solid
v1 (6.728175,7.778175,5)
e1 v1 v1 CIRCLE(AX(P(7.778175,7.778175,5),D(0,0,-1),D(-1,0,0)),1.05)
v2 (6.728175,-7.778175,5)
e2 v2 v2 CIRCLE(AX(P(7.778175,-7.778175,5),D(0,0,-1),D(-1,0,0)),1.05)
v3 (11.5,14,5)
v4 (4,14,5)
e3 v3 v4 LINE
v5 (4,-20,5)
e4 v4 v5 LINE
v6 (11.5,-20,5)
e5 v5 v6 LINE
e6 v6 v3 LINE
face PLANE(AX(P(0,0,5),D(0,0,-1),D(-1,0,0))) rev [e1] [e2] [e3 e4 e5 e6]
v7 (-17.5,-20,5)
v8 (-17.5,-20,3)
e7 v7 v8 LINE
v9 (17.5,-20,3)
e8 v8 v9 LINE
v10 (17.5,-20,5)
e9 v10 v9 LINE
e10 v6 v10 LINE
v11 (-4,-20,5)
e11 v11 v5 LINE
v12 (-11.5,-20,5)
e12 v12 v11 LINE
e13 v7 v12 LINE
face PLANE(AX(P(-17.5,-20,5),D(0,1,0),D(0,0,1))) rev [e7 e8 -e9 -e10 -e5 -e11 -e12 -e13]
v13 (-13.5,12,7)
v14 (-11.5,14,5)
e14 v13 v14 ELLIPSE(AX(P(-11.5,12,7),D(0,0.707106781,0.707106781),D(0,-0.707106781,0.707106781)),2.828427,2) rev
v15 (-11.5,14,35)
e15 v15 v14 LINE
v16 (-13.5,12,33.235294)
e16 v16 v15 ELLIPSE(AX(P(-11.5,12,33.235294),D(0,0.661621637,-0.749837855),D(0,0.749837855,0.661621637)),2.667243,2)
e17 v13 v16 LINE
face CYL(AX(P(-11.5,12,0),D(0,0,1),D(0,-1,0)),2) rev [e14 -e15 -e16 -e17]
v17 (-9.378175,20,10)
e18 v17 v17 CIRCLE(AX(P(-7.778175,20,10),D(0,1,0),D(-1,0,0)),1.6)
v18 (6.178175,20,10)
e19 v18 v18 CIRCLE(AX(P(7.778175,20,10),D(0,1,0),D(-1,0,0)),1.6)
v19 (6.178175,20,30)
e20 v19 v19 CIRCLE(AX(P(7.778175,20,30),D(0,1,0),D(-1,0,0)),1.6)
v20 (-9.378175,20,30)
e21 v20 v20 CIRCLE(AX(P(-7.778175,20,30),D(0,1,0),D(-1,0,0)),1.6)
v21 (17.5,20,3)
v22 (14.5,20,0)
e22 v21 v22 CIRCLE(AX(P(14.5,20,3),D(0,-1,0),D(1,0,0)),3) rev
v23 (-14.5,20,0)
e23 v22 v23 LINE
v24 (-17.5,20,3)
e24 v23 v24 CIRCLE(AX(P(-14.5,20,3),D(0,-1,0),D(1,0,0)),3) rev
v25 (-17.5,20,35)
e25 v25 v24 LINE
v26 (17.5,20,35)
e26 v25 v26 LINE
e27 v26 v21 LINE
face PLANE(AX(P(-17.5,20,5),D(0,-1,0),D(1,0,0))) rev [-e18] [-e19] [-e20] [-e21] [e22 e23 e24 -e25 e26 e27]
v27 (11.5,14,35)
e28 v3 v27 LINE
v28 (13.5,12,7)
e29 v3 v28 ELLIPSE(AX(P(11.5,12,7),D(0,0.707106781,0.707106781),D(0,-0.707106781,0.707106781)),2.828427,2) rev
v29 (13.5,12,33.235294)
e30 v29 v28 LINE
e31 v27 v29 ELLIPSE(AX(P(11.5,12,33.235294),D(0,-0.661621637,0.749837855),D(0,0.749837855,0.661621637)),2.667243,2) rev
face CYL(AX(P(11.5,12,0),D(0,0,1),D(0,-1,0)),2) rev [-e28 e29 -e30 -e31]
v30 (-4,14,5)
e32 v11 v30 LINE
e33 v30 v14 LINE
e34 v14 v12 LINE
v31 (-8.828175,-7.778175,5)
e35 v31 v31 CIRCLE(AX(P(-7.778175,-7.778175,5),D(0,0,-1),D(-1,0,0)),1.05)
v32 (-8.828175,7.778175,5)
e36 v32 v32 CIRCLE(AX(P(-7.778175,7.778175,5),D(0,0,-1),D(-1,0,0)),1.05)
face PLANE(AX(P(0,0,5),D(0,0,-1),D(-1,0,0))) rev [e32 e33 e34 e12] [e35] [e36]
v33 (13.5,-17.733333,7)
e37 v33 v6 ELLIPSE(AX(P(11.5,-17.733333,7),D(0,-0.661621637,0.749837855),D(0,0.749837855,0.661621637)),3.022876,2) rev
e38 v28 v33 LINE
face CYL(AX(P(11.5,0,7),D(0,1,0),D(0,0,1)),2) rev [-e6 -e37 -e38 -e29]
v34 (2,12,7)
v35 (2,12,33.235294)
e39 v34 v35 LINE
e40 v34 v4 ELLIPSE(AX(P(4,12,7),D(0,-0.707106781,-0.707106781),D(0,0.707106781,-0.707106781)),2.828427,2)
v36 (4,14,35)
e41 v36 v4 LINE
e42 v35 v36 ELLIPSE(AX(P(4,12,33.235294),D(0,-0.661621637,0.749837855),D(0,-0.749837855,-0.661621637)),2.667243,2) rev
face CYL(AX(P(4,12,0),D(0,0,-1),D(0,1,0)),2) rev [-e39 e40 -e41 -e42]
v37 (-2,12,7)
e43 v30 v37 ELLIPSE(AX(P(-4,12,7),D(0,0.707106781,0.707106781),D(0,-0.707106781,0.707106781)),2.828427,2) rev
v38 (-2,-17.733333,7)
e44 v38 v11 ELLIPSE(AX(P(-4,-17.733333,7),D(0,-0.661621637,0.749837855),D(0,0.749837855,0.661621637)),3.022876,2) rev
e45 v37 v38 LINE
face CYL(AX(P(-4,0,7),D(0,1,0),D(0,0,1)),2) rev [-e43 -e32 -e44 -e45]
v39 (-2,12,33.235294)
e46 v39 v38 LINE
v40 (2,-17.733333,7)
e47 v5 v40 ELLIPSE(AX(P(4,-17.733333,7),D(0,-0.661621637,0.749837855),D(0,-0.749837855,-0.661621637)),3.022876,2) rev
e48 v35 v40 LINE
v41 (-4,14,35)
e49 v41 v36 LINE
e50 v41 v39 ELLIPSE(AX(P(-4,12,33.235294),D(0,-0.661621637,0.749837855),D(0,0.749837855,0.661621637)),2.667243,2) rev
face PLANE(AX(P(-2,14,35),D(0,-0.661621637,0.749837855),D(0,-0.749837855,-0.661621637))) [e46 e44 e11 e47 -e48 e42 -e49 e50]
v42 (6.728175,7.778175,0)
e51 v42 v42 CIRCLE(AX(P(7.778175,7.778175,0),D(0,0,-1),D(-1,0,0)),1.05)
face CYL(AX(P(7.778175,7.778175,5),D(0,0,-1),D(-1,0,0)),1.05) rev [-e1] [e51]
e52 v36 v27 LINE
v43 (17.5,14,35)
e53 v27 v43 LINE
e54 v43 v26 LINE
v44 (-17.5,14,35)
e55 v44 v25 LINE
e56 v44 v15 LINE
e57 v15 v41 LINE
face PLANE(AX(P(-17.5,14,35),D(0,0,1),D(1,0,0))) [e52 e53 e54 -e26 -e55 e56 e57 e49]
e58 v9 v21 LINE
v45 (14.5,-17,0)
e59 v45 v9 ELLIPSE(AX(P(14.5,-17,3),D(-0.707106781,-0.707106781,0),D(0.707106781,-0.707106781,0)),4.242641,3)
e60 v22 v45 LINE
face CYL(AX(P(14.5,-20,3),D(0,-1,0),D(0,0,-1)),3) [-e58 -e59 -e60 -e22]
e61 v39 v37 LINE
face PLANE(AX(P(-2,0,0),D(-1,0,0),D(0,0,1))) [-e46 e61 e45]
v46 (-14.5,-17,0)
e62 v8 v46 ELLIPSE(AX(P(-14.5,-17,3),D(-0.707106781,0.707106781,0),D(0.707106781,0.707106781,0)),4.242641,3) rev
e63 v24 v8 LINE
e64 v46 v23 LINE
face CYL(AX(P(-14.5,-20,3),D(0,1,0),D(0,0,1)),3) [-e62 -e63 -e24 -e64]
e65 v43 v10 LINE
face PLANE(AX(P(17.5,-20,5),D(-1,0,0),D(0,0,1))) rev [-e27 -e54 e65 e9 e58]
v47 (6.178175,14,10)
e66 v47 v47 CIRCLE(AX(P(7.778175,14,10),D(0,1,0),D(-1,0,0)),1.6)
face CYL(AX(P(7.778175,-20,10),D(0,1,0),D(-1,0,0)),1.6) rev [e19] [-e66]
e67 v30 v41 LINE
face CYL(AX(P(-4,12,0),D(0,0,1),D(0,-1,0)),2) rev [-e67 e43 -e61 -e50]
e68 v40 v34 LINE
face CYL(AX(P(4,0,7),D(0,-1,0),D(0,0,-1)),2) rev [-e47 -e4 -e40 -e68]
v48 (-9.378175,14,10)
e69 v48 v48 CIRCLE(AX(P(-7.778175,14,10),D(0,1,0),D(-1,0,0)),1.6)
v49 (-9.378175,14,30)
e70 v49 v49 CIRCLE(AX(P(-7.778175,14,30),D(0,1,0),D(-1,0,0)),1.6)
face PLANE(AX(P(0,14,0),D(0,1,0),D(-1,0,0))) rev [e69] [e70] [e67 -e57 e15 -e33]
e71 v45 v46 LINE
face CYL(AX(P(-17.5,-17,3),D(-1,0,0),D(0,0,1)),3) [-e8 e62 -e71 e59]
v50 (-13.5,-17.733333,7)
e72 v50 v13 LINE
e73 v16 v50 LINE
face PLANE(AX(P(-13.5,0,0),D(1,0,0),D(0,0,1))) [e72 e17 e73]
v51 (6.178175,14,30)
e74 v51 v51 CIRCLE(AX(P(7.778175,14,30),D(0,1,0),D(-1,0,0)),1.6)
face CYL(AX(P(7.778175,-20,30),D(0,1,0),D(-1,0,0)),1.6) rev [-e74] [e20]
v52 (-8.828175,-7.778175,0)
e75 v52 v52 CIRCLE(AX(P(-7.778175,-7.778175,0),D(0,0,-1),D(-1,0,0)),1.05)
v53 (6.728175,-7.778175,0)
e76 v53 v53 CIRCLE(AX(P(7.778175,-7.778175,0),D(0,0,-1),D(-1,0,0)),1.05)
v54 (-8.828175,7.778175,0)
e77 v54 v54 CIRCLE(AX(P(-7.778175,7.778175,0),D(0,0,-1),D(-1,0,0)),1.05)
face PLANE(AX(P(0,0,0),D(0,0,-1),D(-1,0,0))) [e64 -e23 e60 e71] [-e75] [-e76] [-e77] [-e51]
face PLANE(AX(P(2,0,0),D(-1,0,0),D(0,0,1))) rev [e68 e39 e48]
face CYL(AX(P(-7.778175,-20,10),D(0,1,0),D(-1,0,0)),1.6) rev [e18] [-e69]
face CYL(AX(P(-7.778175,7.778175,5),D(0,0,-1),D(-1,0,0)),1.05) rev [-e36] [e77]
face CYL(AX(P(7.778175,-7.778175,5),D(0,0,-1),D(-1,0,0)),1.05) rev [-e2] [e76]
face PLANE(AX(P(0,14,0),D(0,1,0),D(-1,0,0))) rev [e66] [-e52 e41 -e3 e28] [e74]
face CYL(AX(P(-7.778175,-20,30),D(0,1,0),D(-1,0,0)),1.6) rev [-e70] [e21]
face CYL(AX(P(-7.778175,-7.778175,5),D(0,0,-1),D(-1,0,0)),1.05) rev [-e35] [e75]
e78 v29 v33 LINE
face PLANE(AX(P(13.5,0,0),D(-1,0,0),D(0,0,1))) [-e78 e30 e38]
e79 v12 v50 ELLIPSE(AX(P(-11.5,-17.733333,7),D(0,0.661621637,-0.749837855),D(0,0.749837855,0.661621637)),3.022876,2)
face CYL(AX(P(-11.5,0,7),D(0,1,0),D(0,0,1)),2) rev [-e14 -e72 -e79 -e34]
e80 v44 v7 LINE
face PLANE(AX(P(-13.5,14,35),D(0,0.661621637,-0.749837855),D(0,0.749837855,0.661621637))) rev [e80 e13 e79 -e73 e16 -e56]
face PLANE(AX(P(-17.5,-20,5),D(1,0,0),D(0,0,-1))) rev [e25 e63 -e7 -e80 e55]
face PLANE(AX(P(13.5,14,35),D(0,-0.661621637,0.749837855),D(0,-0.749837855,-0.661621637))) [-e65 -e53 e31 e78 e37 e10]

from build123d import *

# Parameters (mm, degrees)
SKETCH3_W                = 35
SKETCH3_H                = 40
BOSS_EXTRUDE1_DEPTH      = 5
SKETCH5_W                = 35
SKETCH5_H                = 30
BOSS_EXTRUDE2_DEPTH      = 6
BOSS_EXTRUDE3_DEPTH      = 4
BOSS_EXTRUDE4_DEPTH      = 2
BOSS_EXTRUDE4_DEPTH_BACK = 2
SKETCH9_R                = 1.05
CUT_EXTRUDE1_DEPTH       = 5
SKETCH10_R               = 1.6
CUT_EXTRUDE2_DEPTH       = 56.957573214
FILLET1_R                = 3
FILLET2_R                = 2


with BuildPart() as part:
    # Sketch3 → Boss-Extrude1 (new body)
    with BuildSketch(Plane.XY):
        Rectangle(SKETCH3_W, SKETCH3_H)
    extrude(amount=BOSS_EXTRUDE1_DEPTH)

    # Sketch5 → Boss-Extrude2 (add)
    with BuildSketch(Plane(origin=(0, 20, 0), x_dir=(1, 0, 0), z_dir=(0, 1, 0))):
        with Locations((0, -20)):
            Rectangle(SKETCH5_W, SKETCH5_H)
    extrude(amount=-BOSS_EXTRUDE2_DEPTH)

    # Sketch7 → Boss-Extrude3 (add)
    with BuildSketch(Plane(origin=(17.5, 0, 0), x_dir=(0, 0, -1), z_dir=(1, 0, 0))):
        Polygon((-35, 14), (-5, -20), (-5, 14), align=None)
    boss_extrude3 = extrude(amount=-BOSS_EXTRUDE3_DEPTH)

    # Mirror1: Boss-Extrude3 across plane
    add(boss_extrude3.mirror(Plane(origin=(0, 0, 0), x_dir=(0, 0, 1), z_dir=(1, 0, 0))))

    # Sketch8 → Boss-Extrude4 (add, two sides: drawn at the far end of the back side and taken through both)
    with BuildSketch(Plane(origin=(0, 0, 0), x_dir=(0, 0, -1), z_dir=(1, 0, 0)).offset(-BOSS_EXTRUDE4_DEPTH_BACK)):
        Polygon((-35, 14), (-5, -20), (-5, 14), align=None)
    extrude(amount=BOSS_EXTRUDE4_DEPTH + BOSS_EXTRUDE4_DEPTH_BACK)

    # Sketch9 → Cut-Extrude1 (cut)
    with BuildSketch(Plane(origin=(0, 0, 0), x_dir=(-1, 0, 0), z_dir=(0, 0, -1))):
        with Locations((-7.778174593, 7.778174593)):
            Circle(SKETCH9_R)
        with Locations((7.778174593, 7.778174593)):
            Circle(SKETCH9_R)
        with Locations((7.778174593, -7.778174593)):
            Circle(SKETCH9_R)
        with Locations((-7.778174593, -7.778174593)):
            Circle(SKETCH9_R)
    extrude(amount=-CUT_EXTRUDE1_DEPTH, mode=Mode.SUBTRACT)

    # Sketch10 → Cut-Extrude2 (cut, through all)
    with BuildSketch(Plane(origin=(0, 20, 0), x_dir=(1, 0, 0), z_dir=(0, 1, 0))):
        with Locations(Location((-7.778174593, -10, 0), (0, 0, 180))):
            Circle(SKETCH10_R)
        with Locations(Location((-7.778174593, -30, 0), (0, 0, 180))):
            Circle(SKETCH10_R)
        with Locations(Location((7.778174593, -30, 0), (0, 0, 180))):
            Circle(SKETCH10_R)
        with Locations(Location((7.778174593, -10, 0), (0, 0, 180))):
            Circle(SKETCH10_R)
    extrude(amount=-CUT_EXTRUDE2_DEPTH, mode=Mode.SUBTRACT)

    # Fillet1
    fillet1_edges = [part.edges().sort_by_distance(p)[0] for p in [
        (0, -20, 0),
        (-17.5, 0, 0),
        (17.5, 0, 0),
    ]]
    fillet(fillet1_edges, radius=FILLET1_R)

    # Fillet2
    # the kernel refuses this fillet: 2 mm, written as the material it adds along each edge
    with BuildSketch(Plane(origin=(13.5, 14, 0), x_dir=(0, -1, 0), z_dir=(0, 0, 1))) as fillet2_piece_1_section:
        with BuildLine():
            CenterArc((FILLET2_R, -FILLET2_R), FILLET2_R, 90, 90)
            Line((0, -FILLET2_R), (0, 0))
            Line((0, 0), (FILLET2_R, 0))
        make_face()
    fillet2_piece_1 = extrude(amount=35, mode=Mode.PRIVATE)
    fillet2_piece_1 = split(fillet2_piece_1, bisect_by=Plane(origin=(13.047209771, -2.378125245, 20.548713019), z_dir=(0, 0.6616216370868465, -0.7498378553650924)), keep=Keep.TOP, mode=Mode.PRIVATE)
    add(fillet2_piece_1)
    with BuildSketch(Plane(origin=(13.5, -20, 5), x_dir=(-1, 0, 0), z_dir=(0, 1, 0))) as fillet2_piece_2_section:
        with BuildLine():
            CenterArc((FILLET2_R, FILLET2_R), FILLET2_R, 180, 90)
            Line((0, FILLET2_R), (0, 0))
            Line((0, 0), (FILLET2_R, 0))
        make_face()
    fillet2_piece_2 = extrude(amount=39, mode=Mode.PRIVATE)
    fillet2_piece_2 = split(fillet2_piece_2, bisect_by=Plane(origin=(13.043521125, -10.077324079, 13.755302283), z_dir=(0, 0.6616216370868465, -0.7498378553650924)), keep=Keep.TOP, mode=Mode.PRIVATE)
    add(fillet2_piece_2)
    with BuildSketch(Plane(origin=(-13.5, 14, 0), x_dir=(0, -1, 0), z_dir=(0, 0, 1))) as fillet2_piece_3_section:
        with BuildLine():
            CenterArc((FILLET2_R, FILLET2_R), FILLET2_R, 180, 90)
            Line((0, FILLET2_R), (0, 0))
            Line((0, 0), (FILLET2_R, 0))
        make_face()
    fillet2_piece_3 = extrude(amount=35, mode=Mode.PRIVATE)
    fillet2_piece_3 = split(fillet2_piece_3, bisect_by=Plane(origin=(-13.047209771, -2.378125245, 20.548713019), z_dir=(0, 0.6616216370868465, -0.7498378553650924)), keep=Keep.TOP, mode=Mode.PRIVATE)
    add(fillet2_piece_3)
    with BuildSketch(Plane(origin=(-13.5, -20, 5), x_dir=(1, 0, 0), z_dir=(0, 1, 0))) as fillet2_piece_4_section:
        with BuildLine():
            CenterArc((FILLET2_R, -FILLET2_R), FILLET2_R, 90, 90)
            Line((0, -FILLET2_R), (0, 0))
            Line((0, 0), (FILLET2_R, 0))
        make_face()
    fillet2_piece_4 = extrude(amount=39, mode=Mode.PRIVATE)
    fillet2_piece_4 = split(fillet2_piece_4, bisect_by=Plane(origin=(-13.043521125, -10.077324079, 13.755302283), z_dir=(0, 0.6616216370868465, -0.7498378553650924)), keep=Keep.TOP, mode=Mode.PRIVATE)
    add(fillet2_piece_4)
    with BuildSketch(Plane(origin=(-2, 14, 0), x_dir=(-1, 0, 0), z_dir=(0, 0, 1))) as fillet2_piece_5_section:
        with BuildLine():
            CenterArc((FILLET2_R, FILLET2_R), FILLET2_R, 180, 90)
            Line((0, FILLET2_R), (0, 0))
            Line((0, 0), (FILLET2_R, 0))
        make_face()
    fillet2_piece_5 = extrude(amount=35, mode=Mode.PRIVATE)
    fillet2_piece_5 = split(fillet2_piece_5, bisect_by=Plane(origin=(-2.452790229, -2.378125245, 20.548713019), z_dir=(0, 0.6616216370868465, -0.7498378553650924)), keep=Keep.TOP, mode=Mode.PRIVATE)
    add(fillet2_piece_5)
    with BuildSketch(Plane(origin=(-2, -20, 5), x_dir=(-1, 0, 0), z_dir=(0, 1, 0))) as fillet2_piece_6_section:
        with BuildLine():
            CenterArc((FILLET2_R, FILLET2_R), FILLET2_R, 180, 90)
            Line((0, FILLET2_R), (0, 0))
            Line((0, 0), (FILLET2_R, 0))
        make_face()
    fillet2_piece_6 = extrude(amount=39, mode=Mode.PRIVATE)
    fillet2_piece_6 = split(fillet2_piece_6, bisect_by=Plane(origin=(-2.456478875, -10.077324079, 13.755302283), z_dir=(0, 0.6616216370868465, -0.7498378553650924)), keep=Keep.TOP, mode=Mode.PRIVATE)
    add(fillet2_piece_6)
    with BuildSketch(Plane(origin=(2, 14, 0), x_dir=(0, -1, 0), z_dir=(0, 0, 1))) as fillet2_piece_7_section:
        with BuildLine():
            CenterArc((FILLET2_R, FILLET2_R), FILLET2_R, 180, 90)
            Line((0, FILLET2_R), (0, 0))
            Line((0, 0), (FILLET2_R, 0))
        make_face()
    fillet2_piece_7 = extrude(amount=35, mode=Mode.PRIVATE)
    fillet2_piece_7 = split(fillet2_piece_7, bisect_by=Plane(origin=(2.452790229, -2.378125245, 20.548713019), z_dir=(0, 0.6616216370868465, -0.7498378553650924)), keep=Keep.TOP, mode=Mode.PRIVATE)
    add(fillet2_piece_7)
    with BuildSketch(Plane(origin=(2, -20, 5), x_dir=(1, 0, 0), z_dir=(0, 1, 0))) as fillet2_piece_8_section:
        with BuildLine():
            CenterArc((FILLET2_R, -FILLET2_R), FILLET2_R, 90, 90)
            Line((0, -FILLET2_R), (0, 0))
            Line((0, 0), (FILLET2_R, 0))
        make_face()
    fillet2_piece_8 = extrude(amount=39, mode=Mode.PRIVATE)
    fillet2_piece_8 = split(fillet2_piece_8, bisect_by=Plane(origin=(2.456478875, -10.077324079, 13.755302283), z_dir=(0, 0.6616216370868465, -0.7498378553650924)), keep=Keep.TOP, mode=Mode.PRIVATE)
    add(fillet2_piece_8)


solid = part.part
